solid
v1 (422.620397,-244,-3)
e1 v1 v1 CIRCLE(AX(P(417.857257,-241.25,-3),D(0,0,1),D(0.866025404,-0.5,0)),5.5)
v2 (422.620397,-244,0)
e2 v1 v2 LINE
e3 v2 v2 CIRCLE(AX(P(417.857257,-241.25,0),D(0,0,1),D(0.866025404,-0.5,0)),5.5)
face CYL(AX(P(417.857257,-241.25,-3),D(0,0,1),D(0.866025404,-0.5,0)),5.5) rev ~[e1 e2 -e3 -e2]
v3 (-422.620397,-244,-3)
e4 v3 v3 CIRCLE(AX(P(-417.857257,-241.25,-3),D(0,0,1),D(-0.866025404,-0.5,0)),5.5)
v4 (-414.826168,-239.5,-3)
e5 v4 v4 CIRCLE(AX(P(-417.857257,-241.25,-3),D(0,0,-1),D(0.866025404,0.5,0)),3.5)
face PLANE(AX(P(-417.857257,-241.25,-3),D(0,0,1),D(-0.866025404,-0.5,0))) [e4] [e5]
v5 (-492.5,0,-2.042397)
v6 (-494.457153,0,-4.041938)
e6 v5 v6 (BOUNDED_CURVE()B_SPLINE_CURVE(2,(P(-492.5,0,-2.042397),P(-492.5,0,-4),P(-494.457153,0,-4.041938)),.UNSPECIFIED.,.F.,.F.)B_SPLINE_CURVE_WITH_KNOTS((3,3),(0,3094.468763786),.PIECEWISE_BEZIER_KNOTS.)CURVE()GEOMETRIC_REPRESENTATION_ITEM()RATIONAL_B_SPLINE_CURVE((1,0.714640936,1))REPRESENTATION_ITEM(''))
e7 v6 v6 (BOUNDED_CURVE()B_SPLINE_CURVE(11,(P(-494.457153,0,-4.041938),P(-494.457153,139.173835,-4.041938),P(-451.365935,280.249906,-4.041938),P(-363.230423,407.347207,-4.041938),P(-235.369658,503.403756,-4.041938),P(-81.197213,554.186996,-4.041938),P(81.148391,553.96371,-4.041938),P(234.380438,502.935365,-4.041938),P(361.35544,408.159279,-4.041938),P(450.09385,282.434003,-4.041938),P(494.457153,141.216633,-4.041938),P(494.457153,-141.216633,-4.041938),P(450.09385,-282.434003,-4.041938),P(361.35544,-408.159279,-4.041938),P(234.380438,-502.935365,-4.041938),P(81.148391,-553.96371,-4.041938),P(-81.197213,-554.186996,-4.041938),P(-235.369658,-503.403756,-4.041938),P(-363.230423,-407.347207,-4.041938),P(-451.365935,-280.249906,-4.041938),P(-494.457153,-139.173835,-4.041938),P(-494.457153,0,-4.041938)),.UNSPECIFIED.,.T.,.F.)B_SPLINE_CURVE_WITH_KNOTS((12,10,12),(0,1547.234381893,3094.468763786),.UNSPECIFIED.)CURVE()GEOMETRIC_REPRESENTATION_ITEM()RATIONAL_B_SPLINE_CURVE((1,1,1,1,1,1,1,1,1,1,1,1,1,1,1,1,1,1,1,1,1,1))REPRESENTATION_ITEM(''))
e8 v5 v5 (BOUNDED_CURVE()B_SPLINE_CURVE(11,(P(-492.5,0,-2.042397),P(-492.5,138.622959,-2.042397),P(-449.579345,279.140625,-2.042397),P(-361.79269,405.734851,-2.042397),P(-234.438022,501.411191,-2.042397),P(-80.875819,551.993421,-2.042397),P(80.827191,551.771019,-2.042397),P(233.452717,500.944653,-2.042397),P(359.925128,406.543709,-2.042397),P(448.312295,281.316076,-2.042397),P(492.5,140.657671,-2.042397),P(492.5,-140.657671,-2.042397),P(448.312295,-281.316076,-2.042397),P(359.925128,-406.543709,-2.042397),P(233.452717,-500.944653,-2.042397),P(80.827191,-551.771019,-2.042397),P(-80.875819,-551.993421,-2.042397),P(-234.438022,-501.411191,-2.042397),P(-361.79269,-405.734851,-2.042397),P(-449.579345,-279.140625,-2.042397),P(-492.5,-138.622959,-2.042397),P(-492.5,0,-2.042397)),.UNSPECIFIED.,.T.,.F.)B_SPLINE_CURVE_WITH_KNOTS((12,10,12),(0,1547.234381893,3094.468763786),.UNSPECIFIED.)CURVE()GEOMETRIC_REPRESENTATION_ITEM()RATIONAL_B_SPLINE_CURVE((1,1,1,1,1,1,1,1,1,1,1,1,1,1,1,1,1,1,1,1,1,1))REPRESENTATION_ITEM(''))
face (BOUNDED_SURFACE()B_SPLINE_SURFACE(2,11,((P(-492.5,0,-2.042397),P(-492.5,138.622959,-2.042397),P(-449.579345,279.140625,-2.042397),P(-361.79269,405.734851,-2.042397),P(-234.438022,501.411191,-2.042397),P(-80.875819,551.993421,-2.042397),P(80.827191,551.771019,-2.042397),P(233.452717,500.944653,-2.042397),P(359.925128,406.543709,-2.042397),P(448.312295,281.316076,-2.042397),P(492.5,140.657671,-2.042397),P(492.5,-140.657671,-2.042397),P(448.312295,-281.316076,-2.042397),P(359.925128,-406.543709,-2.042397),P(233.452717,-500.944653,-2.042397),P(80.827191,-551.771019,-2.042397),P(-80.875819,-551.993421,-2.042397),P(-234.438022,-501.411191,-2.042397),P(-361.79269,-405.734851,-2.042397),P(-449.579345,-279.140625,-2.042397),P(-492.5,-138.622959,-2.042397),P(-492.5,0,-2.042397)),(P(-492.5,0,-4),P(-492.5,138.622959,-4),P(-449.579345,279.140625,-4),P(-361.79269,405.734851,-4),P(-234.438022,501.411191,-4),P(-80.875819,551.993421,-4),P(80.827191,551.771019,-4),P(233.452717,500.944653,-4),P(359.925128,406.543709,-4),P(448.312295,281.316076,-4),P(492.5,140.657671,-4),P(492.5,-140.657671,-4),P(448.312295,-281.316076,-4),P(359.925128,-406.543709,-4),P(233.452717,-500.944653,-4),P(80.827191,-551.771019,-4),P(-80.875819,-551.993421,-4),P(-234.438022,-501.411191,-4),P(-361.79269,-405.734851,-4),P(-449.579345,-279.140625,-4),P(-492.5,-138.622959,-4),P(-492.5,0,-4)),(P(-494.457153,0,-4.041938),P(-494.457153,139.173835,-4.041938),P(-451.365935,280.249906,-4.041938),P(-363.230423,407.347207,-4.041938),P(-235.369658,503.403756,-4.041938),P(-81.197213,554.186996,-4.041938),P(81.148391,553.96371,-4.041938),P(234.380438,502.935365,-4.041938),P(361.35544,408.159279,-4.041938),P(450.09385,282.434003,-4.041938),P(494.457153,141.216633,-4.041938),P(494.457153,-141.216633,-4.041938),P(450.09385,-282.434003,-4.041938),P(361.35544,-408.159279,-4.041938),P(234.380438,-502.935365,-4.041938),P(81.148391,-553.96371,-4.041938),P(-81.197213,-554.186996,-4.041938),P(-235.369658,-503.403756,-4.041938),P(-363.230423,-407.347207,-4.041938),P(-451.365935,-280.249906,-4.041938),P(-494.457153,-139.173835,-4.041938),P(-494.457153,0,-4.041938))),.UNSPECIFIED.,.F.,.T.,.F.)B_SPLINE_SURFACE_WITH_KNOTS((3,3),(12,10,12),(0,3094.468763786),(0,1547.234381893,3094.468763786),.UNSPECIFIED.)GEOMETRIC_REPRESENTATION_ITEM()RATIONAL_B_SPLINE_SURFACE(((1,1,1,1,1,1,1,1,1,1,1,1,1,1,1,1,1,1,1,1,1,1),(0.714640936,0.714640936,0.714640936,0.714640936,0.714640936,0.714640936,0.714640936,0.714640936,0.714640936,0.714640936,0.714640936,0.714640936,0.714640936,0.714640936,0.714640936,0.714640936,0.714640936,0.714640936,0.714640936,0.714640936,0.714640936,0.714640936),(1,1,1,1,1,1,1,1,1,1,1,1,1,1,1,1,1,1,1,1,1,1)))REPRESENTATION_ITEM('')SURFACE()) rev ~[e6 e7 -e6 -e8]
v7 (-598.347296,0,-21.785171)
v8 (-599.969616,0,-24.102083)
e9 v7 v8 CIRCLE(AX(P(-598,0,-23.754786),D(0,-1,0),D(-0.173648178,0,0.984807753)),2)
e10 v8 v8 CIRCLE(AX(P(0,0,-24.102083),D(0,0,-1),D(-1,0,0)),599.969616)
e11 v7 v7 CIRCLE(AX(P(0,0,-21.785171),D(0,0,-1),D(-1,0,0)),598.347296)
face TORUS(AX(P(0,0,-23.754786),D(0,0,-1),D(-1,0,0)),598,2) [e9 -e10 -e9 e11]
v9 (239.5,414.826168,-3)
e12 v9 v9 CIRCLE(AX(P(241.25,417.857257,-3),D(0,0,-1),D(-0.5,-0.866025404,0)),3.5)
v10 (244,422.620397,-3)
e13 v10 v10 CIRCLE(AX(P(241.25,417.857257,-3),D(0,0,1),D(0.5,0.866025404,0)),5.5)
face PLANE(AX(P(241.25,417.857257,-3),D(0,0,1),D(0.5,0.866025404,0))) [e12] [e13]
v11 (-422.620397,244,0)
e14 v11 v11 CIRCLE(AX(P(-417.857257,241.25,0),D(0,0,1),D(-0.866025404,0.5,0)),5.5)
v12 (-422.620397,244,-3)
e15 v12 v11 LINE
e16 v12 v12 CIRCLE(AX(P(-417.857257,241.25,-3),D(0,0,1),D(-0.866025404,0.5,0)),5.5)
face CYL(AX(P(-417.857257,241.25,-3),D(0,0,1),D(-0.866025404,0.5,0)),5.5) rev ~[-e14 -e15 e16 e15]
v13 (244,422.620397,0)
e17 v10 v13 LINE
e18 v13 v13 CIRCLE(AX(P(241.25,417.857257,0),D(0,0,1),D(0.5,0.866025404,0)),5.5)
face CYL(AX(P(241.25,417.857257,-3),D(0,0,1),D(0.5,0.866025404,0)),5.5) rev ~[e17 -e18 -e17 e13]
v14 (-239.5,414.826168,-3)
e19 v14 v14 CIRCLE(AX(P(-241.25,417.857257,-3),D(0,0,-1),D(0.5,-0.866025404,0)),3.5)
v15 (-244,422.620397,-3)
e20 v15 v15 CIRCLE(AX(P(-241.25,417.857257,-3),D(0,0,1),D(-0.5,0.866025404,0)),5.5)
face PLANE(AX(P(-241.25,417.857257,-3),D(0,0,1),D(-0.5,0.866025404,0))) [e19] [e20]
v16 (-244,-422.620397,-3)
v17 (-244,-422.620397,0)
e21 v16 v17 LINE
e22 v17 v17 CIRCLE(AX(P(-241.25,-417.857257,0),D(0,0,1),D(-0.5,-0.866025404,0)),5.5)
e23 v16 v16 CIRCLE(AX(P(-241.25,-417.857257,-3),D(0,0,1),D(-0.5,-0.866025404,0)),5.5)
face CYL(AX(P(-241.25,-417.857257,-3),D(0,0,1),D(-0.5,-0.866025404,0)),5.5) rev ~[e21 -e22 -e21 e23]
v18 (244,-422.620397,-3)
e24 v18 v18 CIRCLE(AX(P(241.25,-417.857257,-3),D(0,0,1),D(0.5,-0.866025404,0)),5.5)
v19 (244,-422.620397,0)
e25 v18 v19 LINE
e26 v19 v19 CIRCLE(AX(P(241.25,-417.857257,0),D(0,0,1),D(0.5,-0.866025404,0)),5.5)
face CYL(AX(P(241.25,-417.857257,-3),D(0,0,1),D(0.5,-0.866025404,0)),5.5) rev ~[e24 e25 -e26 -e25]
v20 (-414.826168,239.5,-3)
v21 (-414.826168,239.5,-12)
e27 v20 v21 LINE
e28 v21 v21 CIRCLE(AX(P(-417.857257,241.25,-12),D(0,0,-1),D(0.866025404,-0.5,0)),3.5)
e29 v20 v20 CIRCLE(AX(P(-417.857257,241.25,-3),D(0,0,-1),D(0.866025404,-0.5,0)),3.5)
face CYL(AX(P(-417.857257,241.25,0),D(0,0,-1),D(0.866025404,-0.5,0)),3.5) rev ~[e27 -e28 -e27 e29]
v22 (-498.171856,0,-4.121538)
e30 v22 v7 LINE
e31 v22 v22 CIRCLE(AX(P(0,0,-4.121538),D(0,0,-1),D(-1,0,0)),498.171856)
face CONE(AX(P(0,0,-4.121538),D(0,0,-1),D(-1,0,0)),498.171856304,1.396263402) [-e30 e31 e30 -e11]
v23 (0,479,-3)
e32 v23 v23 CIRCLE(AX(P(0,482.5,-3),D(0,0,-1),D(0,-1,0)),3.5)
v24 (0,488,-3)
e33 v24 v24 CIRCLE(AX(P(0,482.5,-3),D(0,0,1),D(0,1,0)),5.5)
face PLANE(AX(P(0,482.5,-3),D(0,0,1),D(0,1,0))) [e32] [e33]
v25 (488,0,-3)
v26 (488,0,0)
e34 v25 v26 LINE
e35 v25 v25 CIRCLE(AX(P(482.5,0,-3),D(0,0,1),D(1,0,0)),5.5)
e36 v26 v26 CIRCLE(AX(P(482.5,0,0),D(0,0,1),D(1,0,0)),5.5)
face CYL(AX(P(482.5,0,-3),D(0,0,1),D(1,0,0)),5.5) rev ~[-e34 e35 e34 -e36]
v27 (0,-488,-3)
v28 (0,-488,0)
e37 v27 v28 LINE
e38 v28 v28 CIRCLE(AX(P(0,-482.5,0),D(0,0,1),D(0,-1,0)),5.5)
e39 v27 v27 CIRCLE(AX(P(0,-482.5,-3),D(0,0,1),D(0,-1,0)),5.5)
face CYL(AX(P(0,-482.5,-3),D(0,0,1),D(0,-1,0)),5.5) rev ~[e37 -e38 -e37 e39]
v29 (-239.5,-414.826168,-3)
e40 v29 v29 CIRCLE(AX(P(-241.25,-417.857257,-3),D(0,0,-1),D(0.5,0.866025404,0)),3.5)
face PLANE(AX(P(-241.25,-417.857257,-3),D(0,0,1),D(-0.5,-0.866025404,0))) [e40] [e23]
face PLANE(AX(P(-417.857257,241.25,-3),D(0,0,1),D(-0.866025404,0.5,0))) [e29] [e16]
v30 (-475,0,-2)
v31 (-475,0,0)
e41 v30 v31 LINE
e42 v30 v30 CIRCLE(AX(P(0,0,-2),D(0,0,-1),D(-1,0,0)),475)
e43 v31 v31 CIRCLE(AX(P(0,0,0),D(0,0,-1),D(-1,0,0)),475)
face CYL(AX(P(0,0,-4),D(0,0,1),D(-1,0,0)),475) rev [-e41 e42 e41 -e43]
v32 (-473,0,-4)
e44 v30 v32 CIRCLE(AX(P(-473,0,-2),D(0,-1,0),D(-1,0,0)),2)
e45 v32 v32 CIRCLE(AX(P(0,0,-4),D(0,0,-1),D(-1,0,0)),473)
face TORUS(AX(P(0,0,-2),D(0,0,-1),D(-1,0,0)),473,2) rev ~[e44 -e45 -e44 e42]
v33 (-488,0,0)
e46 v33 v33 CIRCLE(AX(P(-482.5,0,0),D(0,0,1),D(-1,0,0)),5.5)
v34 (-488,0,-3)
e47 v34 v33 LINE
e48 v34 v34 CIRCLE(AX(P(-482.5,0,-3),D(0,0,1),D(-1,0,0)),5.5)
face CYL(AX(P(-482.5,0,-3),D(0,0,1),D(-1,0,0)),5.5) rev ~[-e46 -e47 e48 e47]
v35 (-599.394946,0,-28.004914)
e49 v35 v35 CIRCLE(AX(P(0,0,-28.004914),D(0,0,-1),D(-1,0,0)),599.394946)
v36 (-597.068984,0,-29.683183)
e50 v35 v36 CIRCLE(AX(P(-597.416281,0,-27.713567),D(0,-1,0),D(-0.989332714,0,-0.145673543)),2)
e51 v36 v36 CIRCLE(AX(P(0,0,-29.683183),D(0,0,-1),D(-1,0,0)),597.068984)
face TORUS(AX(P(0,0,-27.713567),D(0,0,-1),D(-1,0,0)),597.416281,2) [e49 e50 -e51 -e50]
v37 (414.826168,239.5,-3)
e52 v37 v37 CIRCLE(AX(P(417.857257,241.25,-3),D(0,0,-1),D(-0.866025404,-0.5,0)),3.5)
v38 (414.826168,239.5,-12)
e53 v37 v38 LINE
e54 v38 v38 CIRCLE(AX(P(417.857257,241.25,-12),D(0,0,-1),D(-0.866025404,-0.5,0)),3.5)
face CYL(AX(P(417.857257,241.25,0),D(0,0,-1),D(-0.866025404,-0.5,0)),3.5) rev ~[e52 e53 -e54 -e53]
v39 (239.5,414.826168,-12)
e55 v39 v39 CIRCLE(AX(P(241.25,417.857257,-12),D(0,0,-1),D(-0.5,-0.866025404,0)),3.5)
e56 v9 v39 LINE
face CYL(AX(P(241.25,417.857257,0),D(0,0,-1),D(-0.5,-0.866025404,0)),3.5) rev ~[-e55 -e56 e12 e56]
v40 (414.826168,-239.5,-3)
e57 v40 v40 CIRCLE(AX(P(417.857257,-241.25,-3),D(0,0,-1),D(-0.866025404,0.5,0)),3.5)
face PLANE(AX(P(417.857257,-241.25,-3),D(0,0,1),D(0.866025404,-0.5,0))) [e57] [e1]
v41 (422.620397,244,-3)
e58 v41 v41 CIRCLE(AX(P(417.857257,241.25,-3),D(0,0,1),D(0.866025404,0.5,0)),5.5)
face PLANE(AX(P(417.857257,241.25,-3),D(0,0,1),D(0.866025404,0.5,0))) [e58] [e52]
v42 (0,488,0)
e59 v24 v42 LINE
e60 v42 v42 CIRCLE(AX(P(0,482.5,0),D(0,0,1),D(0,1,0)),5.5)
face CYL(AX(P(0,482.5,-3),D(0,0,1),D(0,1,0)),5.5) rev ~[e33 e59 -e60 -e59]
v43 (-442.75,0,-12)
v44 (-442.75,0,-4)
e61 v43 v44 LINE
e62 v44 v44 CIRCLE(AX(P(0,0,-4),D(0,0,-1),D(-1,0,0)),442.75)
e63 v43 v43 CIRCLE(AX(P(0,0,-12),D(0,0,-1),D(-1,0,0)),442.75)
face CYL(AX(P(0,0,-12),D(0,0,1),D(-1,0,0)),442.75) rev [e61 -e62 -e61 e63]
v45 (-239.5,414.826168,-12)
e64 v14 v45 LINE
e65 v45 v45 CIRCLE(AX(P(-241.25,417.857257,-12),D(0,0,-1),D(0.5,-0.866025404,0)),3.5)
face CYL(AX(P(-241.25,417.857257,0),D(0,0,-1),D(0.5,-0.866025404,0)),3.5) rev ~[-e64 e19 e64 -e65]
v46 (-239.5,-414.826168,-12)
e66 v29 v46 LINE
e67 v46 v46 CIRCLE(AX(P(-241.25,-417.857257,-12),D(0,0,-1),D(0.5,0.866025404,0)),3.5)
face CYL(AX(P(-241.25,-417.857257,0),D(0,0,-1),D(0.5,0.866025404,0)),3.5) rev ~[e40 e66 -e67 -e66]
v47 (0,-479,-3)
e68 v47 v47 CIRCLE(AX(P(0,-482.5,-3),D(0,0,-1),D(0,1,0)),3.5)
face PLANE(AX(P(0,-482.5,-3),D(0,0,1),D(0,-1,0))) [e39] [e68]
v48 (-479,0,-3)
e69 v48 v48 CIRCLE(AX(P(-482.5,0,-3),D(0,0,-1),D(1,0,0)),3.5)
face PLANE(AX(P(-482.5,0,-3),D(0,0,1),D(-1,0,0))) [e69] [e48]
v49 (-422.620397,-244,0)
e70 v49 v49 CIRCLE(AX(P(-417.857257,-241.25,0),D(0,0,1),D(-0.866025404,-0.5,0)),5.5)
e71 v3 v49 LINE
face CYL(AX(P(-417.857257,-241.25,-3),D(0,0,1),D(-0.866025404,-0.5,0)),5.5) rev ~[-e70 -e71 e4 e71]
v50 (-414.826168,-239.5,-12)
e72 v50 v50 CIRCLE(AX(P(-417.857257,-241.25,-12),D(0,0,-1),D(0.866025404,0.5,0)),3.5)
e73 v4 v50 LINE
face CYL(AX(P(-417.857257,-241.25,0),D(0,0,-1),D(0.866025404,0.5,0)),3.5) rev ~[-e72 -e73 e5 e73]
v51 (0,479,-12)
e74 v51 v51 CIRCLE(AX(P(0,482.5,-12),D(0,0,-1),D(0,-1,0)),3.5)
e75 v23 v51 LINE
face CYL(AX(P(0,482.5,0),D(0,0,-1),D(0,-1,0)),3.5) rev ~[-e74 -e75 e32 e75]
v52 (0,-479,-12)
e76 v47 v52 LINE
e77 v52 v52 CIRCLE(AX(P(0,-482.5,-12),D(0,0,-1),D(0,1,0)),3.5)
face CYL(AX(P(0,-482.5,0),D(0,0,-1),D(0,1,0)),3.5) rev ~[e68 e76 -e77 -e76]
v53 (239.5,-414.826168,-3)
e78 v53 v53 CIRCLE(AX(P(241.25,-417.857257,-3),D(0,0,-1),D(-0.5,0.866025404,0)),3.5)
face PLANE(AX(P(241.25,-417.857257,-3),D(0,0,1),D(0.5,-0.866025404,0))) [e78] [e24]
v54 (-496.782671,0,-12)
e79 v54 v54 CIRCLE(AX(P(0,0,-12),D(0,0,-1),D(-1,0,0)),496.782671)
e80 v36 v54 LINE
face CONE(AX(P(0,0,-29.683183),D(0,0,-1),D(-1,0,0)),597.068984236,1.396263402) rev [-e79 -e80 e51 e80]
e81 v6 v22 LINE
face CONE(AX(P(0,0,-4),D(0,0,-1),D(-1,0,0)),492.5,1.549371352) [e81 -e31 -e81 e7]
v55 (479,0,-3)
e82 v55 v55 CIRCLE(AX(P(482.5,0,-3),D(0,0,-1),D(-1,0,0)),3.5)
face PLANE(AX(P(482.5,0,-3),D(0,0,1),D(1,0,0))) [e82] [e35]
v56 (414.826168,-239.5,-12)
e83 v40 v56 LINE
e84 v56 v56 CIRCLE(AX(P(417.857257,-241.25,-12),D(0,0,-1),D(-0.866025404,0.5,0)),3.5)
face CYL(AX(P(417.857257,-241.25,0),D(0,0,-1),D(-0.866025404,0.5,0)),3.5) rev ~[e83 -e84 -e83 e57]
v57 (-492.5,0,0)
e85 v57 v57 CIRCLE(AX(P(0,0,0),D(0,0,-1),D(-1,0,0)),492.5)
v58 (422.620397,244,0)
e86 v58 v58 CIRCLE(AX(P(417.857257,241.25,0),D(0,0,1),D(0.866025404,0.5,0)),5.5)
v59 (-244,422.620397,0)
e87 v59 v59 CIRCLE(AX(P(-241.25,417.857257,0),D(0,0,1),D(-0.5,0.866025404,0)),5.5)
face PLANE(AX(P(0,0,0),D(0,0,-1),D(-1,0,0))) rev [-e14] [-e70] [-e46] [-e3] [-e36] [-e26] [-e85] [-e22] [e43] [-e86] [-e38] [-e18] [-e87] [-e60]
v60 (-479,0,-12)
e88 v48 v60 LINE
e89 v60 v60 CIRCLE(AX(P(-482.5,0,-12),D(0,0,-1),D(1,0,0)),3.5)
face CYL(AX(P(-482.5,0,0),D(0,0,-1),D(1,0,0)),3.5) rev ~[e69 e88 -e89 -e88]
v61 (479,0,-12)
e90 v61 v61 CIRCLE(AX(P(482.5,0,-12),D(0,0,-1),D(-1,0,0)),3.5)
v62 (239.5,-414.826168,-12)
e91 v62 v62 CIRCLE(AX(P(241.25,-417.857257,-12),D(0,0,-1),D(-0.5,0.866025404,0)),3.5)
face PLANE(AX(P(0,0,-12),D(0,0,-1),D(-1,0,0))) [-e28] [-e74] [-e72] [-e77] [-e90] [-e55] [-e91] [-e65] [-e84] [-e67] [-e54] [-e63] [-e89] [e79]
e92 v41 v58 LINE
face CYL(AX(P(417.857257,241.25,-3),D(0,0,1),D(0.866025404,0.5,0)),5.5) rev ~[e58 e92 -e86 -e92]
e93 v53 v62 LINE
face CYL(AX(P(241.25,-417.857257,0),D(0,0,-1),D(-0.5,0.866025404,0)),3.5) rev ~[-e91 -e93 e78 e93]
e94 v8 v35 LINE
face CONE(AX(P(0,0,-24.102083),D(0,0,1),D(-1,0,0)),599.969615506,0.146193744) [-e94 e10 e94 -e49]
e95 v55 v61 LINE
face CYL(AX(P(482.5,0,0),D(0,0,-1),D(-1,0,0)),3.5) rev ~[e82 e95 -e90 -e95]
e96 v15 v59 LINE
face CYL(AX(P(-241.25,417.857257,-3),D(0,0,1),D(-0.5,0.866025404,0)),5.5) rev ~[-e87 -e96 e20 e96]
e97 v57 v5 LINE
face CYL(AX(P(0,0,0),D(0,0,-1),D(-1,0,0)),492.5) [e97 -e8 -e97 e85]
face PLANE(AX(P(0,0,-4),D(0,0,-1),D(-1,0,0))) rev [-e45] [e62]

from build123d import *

# Parameters (mm, degrees)
F2_R            = 2
F3_R            = 2
F5_D            = 7
F5_CBORE_D      = 11
F5_CBORE_DEPTH  = 3
F5_COPIES_COUNT = 12


# Not quite as in the source:
# - a pattern or mirror of a feature is missing from the dataset's text; its kind, count and spacing are read off the source's solid


with BuildPart() as f1:
    # F0 (on Front) → F1 (revolve)
    with BuildSketch(Plane.XZ):
        with BuildLine():
            Line((-475, -4), (-475, 0))
            Line((-475, 0), (-492.5, 0))
            Line((-492.5, 0), (-492.5, -4))
            Line((-492.5, -4), (-498.1718563043, -4.1215379759))
            Line((-498.1718563043, -4.1215379759), (-598.3472963553, -21.7851708612))
            ThreePointArc((-598.3472963553, -21.7851708612), (-599.6383040886, -22.6076334946), (-599.969615506, -24.1020827226))
            Line((-599.969615506, -24.1020827226), (-599.3949460194, -28.0049144208))
            ThreePointArc((-599.3949460194, -28.0049144208), (-598.5865316264, -29.3354528156), (-597.0689842363, -29.68318284))
            Line((-597.0689842363, -29.68318284), (-496.782670883, -12))
            Line((-496.782670883, -12), (-442.75, -12))
            Line((-442.75, -12), (-442.75, -4))
            Line((-442.75, -4), (-475, -4))
        make_face()
    revolve(axis=Axis((0, 0, -202.4746355881), (0, 0, -1)))

    # F2
    f2_edges = [f1.edges().sort_by_distance(p)[0] for p in [
        (475, 0, -4),
    ]]
    fillet(f2_edges, radius=F2_R)

    # F3
    f3_edges = [f1.edges().sort_by_distance(p)[0] for p in [
        (492.5, 0, -4),
    ]]
    fillet(f3_edges, radius=F3_R)

    # F5 (through all)
    with Locations(Plane.XY):
        with Locations((482.5, 0)):
            f5 = CounterBoreHole(F5_D / 2, F5_CBORE_D / 2, F5_CBORE_DEPTH)

    # F5_copies: F5 ×12 about axis
    f5_copies_axis = Axis((0, 0, 0), (0, 0, 1))
    for i in range(1, F5_COPIES_COUNT):
        add(f5.rotate(f5_copies_axis, i * 360 / F5_COPIES_COUNT), mode=Mode.SUBTRACT)


solid = f1.part
